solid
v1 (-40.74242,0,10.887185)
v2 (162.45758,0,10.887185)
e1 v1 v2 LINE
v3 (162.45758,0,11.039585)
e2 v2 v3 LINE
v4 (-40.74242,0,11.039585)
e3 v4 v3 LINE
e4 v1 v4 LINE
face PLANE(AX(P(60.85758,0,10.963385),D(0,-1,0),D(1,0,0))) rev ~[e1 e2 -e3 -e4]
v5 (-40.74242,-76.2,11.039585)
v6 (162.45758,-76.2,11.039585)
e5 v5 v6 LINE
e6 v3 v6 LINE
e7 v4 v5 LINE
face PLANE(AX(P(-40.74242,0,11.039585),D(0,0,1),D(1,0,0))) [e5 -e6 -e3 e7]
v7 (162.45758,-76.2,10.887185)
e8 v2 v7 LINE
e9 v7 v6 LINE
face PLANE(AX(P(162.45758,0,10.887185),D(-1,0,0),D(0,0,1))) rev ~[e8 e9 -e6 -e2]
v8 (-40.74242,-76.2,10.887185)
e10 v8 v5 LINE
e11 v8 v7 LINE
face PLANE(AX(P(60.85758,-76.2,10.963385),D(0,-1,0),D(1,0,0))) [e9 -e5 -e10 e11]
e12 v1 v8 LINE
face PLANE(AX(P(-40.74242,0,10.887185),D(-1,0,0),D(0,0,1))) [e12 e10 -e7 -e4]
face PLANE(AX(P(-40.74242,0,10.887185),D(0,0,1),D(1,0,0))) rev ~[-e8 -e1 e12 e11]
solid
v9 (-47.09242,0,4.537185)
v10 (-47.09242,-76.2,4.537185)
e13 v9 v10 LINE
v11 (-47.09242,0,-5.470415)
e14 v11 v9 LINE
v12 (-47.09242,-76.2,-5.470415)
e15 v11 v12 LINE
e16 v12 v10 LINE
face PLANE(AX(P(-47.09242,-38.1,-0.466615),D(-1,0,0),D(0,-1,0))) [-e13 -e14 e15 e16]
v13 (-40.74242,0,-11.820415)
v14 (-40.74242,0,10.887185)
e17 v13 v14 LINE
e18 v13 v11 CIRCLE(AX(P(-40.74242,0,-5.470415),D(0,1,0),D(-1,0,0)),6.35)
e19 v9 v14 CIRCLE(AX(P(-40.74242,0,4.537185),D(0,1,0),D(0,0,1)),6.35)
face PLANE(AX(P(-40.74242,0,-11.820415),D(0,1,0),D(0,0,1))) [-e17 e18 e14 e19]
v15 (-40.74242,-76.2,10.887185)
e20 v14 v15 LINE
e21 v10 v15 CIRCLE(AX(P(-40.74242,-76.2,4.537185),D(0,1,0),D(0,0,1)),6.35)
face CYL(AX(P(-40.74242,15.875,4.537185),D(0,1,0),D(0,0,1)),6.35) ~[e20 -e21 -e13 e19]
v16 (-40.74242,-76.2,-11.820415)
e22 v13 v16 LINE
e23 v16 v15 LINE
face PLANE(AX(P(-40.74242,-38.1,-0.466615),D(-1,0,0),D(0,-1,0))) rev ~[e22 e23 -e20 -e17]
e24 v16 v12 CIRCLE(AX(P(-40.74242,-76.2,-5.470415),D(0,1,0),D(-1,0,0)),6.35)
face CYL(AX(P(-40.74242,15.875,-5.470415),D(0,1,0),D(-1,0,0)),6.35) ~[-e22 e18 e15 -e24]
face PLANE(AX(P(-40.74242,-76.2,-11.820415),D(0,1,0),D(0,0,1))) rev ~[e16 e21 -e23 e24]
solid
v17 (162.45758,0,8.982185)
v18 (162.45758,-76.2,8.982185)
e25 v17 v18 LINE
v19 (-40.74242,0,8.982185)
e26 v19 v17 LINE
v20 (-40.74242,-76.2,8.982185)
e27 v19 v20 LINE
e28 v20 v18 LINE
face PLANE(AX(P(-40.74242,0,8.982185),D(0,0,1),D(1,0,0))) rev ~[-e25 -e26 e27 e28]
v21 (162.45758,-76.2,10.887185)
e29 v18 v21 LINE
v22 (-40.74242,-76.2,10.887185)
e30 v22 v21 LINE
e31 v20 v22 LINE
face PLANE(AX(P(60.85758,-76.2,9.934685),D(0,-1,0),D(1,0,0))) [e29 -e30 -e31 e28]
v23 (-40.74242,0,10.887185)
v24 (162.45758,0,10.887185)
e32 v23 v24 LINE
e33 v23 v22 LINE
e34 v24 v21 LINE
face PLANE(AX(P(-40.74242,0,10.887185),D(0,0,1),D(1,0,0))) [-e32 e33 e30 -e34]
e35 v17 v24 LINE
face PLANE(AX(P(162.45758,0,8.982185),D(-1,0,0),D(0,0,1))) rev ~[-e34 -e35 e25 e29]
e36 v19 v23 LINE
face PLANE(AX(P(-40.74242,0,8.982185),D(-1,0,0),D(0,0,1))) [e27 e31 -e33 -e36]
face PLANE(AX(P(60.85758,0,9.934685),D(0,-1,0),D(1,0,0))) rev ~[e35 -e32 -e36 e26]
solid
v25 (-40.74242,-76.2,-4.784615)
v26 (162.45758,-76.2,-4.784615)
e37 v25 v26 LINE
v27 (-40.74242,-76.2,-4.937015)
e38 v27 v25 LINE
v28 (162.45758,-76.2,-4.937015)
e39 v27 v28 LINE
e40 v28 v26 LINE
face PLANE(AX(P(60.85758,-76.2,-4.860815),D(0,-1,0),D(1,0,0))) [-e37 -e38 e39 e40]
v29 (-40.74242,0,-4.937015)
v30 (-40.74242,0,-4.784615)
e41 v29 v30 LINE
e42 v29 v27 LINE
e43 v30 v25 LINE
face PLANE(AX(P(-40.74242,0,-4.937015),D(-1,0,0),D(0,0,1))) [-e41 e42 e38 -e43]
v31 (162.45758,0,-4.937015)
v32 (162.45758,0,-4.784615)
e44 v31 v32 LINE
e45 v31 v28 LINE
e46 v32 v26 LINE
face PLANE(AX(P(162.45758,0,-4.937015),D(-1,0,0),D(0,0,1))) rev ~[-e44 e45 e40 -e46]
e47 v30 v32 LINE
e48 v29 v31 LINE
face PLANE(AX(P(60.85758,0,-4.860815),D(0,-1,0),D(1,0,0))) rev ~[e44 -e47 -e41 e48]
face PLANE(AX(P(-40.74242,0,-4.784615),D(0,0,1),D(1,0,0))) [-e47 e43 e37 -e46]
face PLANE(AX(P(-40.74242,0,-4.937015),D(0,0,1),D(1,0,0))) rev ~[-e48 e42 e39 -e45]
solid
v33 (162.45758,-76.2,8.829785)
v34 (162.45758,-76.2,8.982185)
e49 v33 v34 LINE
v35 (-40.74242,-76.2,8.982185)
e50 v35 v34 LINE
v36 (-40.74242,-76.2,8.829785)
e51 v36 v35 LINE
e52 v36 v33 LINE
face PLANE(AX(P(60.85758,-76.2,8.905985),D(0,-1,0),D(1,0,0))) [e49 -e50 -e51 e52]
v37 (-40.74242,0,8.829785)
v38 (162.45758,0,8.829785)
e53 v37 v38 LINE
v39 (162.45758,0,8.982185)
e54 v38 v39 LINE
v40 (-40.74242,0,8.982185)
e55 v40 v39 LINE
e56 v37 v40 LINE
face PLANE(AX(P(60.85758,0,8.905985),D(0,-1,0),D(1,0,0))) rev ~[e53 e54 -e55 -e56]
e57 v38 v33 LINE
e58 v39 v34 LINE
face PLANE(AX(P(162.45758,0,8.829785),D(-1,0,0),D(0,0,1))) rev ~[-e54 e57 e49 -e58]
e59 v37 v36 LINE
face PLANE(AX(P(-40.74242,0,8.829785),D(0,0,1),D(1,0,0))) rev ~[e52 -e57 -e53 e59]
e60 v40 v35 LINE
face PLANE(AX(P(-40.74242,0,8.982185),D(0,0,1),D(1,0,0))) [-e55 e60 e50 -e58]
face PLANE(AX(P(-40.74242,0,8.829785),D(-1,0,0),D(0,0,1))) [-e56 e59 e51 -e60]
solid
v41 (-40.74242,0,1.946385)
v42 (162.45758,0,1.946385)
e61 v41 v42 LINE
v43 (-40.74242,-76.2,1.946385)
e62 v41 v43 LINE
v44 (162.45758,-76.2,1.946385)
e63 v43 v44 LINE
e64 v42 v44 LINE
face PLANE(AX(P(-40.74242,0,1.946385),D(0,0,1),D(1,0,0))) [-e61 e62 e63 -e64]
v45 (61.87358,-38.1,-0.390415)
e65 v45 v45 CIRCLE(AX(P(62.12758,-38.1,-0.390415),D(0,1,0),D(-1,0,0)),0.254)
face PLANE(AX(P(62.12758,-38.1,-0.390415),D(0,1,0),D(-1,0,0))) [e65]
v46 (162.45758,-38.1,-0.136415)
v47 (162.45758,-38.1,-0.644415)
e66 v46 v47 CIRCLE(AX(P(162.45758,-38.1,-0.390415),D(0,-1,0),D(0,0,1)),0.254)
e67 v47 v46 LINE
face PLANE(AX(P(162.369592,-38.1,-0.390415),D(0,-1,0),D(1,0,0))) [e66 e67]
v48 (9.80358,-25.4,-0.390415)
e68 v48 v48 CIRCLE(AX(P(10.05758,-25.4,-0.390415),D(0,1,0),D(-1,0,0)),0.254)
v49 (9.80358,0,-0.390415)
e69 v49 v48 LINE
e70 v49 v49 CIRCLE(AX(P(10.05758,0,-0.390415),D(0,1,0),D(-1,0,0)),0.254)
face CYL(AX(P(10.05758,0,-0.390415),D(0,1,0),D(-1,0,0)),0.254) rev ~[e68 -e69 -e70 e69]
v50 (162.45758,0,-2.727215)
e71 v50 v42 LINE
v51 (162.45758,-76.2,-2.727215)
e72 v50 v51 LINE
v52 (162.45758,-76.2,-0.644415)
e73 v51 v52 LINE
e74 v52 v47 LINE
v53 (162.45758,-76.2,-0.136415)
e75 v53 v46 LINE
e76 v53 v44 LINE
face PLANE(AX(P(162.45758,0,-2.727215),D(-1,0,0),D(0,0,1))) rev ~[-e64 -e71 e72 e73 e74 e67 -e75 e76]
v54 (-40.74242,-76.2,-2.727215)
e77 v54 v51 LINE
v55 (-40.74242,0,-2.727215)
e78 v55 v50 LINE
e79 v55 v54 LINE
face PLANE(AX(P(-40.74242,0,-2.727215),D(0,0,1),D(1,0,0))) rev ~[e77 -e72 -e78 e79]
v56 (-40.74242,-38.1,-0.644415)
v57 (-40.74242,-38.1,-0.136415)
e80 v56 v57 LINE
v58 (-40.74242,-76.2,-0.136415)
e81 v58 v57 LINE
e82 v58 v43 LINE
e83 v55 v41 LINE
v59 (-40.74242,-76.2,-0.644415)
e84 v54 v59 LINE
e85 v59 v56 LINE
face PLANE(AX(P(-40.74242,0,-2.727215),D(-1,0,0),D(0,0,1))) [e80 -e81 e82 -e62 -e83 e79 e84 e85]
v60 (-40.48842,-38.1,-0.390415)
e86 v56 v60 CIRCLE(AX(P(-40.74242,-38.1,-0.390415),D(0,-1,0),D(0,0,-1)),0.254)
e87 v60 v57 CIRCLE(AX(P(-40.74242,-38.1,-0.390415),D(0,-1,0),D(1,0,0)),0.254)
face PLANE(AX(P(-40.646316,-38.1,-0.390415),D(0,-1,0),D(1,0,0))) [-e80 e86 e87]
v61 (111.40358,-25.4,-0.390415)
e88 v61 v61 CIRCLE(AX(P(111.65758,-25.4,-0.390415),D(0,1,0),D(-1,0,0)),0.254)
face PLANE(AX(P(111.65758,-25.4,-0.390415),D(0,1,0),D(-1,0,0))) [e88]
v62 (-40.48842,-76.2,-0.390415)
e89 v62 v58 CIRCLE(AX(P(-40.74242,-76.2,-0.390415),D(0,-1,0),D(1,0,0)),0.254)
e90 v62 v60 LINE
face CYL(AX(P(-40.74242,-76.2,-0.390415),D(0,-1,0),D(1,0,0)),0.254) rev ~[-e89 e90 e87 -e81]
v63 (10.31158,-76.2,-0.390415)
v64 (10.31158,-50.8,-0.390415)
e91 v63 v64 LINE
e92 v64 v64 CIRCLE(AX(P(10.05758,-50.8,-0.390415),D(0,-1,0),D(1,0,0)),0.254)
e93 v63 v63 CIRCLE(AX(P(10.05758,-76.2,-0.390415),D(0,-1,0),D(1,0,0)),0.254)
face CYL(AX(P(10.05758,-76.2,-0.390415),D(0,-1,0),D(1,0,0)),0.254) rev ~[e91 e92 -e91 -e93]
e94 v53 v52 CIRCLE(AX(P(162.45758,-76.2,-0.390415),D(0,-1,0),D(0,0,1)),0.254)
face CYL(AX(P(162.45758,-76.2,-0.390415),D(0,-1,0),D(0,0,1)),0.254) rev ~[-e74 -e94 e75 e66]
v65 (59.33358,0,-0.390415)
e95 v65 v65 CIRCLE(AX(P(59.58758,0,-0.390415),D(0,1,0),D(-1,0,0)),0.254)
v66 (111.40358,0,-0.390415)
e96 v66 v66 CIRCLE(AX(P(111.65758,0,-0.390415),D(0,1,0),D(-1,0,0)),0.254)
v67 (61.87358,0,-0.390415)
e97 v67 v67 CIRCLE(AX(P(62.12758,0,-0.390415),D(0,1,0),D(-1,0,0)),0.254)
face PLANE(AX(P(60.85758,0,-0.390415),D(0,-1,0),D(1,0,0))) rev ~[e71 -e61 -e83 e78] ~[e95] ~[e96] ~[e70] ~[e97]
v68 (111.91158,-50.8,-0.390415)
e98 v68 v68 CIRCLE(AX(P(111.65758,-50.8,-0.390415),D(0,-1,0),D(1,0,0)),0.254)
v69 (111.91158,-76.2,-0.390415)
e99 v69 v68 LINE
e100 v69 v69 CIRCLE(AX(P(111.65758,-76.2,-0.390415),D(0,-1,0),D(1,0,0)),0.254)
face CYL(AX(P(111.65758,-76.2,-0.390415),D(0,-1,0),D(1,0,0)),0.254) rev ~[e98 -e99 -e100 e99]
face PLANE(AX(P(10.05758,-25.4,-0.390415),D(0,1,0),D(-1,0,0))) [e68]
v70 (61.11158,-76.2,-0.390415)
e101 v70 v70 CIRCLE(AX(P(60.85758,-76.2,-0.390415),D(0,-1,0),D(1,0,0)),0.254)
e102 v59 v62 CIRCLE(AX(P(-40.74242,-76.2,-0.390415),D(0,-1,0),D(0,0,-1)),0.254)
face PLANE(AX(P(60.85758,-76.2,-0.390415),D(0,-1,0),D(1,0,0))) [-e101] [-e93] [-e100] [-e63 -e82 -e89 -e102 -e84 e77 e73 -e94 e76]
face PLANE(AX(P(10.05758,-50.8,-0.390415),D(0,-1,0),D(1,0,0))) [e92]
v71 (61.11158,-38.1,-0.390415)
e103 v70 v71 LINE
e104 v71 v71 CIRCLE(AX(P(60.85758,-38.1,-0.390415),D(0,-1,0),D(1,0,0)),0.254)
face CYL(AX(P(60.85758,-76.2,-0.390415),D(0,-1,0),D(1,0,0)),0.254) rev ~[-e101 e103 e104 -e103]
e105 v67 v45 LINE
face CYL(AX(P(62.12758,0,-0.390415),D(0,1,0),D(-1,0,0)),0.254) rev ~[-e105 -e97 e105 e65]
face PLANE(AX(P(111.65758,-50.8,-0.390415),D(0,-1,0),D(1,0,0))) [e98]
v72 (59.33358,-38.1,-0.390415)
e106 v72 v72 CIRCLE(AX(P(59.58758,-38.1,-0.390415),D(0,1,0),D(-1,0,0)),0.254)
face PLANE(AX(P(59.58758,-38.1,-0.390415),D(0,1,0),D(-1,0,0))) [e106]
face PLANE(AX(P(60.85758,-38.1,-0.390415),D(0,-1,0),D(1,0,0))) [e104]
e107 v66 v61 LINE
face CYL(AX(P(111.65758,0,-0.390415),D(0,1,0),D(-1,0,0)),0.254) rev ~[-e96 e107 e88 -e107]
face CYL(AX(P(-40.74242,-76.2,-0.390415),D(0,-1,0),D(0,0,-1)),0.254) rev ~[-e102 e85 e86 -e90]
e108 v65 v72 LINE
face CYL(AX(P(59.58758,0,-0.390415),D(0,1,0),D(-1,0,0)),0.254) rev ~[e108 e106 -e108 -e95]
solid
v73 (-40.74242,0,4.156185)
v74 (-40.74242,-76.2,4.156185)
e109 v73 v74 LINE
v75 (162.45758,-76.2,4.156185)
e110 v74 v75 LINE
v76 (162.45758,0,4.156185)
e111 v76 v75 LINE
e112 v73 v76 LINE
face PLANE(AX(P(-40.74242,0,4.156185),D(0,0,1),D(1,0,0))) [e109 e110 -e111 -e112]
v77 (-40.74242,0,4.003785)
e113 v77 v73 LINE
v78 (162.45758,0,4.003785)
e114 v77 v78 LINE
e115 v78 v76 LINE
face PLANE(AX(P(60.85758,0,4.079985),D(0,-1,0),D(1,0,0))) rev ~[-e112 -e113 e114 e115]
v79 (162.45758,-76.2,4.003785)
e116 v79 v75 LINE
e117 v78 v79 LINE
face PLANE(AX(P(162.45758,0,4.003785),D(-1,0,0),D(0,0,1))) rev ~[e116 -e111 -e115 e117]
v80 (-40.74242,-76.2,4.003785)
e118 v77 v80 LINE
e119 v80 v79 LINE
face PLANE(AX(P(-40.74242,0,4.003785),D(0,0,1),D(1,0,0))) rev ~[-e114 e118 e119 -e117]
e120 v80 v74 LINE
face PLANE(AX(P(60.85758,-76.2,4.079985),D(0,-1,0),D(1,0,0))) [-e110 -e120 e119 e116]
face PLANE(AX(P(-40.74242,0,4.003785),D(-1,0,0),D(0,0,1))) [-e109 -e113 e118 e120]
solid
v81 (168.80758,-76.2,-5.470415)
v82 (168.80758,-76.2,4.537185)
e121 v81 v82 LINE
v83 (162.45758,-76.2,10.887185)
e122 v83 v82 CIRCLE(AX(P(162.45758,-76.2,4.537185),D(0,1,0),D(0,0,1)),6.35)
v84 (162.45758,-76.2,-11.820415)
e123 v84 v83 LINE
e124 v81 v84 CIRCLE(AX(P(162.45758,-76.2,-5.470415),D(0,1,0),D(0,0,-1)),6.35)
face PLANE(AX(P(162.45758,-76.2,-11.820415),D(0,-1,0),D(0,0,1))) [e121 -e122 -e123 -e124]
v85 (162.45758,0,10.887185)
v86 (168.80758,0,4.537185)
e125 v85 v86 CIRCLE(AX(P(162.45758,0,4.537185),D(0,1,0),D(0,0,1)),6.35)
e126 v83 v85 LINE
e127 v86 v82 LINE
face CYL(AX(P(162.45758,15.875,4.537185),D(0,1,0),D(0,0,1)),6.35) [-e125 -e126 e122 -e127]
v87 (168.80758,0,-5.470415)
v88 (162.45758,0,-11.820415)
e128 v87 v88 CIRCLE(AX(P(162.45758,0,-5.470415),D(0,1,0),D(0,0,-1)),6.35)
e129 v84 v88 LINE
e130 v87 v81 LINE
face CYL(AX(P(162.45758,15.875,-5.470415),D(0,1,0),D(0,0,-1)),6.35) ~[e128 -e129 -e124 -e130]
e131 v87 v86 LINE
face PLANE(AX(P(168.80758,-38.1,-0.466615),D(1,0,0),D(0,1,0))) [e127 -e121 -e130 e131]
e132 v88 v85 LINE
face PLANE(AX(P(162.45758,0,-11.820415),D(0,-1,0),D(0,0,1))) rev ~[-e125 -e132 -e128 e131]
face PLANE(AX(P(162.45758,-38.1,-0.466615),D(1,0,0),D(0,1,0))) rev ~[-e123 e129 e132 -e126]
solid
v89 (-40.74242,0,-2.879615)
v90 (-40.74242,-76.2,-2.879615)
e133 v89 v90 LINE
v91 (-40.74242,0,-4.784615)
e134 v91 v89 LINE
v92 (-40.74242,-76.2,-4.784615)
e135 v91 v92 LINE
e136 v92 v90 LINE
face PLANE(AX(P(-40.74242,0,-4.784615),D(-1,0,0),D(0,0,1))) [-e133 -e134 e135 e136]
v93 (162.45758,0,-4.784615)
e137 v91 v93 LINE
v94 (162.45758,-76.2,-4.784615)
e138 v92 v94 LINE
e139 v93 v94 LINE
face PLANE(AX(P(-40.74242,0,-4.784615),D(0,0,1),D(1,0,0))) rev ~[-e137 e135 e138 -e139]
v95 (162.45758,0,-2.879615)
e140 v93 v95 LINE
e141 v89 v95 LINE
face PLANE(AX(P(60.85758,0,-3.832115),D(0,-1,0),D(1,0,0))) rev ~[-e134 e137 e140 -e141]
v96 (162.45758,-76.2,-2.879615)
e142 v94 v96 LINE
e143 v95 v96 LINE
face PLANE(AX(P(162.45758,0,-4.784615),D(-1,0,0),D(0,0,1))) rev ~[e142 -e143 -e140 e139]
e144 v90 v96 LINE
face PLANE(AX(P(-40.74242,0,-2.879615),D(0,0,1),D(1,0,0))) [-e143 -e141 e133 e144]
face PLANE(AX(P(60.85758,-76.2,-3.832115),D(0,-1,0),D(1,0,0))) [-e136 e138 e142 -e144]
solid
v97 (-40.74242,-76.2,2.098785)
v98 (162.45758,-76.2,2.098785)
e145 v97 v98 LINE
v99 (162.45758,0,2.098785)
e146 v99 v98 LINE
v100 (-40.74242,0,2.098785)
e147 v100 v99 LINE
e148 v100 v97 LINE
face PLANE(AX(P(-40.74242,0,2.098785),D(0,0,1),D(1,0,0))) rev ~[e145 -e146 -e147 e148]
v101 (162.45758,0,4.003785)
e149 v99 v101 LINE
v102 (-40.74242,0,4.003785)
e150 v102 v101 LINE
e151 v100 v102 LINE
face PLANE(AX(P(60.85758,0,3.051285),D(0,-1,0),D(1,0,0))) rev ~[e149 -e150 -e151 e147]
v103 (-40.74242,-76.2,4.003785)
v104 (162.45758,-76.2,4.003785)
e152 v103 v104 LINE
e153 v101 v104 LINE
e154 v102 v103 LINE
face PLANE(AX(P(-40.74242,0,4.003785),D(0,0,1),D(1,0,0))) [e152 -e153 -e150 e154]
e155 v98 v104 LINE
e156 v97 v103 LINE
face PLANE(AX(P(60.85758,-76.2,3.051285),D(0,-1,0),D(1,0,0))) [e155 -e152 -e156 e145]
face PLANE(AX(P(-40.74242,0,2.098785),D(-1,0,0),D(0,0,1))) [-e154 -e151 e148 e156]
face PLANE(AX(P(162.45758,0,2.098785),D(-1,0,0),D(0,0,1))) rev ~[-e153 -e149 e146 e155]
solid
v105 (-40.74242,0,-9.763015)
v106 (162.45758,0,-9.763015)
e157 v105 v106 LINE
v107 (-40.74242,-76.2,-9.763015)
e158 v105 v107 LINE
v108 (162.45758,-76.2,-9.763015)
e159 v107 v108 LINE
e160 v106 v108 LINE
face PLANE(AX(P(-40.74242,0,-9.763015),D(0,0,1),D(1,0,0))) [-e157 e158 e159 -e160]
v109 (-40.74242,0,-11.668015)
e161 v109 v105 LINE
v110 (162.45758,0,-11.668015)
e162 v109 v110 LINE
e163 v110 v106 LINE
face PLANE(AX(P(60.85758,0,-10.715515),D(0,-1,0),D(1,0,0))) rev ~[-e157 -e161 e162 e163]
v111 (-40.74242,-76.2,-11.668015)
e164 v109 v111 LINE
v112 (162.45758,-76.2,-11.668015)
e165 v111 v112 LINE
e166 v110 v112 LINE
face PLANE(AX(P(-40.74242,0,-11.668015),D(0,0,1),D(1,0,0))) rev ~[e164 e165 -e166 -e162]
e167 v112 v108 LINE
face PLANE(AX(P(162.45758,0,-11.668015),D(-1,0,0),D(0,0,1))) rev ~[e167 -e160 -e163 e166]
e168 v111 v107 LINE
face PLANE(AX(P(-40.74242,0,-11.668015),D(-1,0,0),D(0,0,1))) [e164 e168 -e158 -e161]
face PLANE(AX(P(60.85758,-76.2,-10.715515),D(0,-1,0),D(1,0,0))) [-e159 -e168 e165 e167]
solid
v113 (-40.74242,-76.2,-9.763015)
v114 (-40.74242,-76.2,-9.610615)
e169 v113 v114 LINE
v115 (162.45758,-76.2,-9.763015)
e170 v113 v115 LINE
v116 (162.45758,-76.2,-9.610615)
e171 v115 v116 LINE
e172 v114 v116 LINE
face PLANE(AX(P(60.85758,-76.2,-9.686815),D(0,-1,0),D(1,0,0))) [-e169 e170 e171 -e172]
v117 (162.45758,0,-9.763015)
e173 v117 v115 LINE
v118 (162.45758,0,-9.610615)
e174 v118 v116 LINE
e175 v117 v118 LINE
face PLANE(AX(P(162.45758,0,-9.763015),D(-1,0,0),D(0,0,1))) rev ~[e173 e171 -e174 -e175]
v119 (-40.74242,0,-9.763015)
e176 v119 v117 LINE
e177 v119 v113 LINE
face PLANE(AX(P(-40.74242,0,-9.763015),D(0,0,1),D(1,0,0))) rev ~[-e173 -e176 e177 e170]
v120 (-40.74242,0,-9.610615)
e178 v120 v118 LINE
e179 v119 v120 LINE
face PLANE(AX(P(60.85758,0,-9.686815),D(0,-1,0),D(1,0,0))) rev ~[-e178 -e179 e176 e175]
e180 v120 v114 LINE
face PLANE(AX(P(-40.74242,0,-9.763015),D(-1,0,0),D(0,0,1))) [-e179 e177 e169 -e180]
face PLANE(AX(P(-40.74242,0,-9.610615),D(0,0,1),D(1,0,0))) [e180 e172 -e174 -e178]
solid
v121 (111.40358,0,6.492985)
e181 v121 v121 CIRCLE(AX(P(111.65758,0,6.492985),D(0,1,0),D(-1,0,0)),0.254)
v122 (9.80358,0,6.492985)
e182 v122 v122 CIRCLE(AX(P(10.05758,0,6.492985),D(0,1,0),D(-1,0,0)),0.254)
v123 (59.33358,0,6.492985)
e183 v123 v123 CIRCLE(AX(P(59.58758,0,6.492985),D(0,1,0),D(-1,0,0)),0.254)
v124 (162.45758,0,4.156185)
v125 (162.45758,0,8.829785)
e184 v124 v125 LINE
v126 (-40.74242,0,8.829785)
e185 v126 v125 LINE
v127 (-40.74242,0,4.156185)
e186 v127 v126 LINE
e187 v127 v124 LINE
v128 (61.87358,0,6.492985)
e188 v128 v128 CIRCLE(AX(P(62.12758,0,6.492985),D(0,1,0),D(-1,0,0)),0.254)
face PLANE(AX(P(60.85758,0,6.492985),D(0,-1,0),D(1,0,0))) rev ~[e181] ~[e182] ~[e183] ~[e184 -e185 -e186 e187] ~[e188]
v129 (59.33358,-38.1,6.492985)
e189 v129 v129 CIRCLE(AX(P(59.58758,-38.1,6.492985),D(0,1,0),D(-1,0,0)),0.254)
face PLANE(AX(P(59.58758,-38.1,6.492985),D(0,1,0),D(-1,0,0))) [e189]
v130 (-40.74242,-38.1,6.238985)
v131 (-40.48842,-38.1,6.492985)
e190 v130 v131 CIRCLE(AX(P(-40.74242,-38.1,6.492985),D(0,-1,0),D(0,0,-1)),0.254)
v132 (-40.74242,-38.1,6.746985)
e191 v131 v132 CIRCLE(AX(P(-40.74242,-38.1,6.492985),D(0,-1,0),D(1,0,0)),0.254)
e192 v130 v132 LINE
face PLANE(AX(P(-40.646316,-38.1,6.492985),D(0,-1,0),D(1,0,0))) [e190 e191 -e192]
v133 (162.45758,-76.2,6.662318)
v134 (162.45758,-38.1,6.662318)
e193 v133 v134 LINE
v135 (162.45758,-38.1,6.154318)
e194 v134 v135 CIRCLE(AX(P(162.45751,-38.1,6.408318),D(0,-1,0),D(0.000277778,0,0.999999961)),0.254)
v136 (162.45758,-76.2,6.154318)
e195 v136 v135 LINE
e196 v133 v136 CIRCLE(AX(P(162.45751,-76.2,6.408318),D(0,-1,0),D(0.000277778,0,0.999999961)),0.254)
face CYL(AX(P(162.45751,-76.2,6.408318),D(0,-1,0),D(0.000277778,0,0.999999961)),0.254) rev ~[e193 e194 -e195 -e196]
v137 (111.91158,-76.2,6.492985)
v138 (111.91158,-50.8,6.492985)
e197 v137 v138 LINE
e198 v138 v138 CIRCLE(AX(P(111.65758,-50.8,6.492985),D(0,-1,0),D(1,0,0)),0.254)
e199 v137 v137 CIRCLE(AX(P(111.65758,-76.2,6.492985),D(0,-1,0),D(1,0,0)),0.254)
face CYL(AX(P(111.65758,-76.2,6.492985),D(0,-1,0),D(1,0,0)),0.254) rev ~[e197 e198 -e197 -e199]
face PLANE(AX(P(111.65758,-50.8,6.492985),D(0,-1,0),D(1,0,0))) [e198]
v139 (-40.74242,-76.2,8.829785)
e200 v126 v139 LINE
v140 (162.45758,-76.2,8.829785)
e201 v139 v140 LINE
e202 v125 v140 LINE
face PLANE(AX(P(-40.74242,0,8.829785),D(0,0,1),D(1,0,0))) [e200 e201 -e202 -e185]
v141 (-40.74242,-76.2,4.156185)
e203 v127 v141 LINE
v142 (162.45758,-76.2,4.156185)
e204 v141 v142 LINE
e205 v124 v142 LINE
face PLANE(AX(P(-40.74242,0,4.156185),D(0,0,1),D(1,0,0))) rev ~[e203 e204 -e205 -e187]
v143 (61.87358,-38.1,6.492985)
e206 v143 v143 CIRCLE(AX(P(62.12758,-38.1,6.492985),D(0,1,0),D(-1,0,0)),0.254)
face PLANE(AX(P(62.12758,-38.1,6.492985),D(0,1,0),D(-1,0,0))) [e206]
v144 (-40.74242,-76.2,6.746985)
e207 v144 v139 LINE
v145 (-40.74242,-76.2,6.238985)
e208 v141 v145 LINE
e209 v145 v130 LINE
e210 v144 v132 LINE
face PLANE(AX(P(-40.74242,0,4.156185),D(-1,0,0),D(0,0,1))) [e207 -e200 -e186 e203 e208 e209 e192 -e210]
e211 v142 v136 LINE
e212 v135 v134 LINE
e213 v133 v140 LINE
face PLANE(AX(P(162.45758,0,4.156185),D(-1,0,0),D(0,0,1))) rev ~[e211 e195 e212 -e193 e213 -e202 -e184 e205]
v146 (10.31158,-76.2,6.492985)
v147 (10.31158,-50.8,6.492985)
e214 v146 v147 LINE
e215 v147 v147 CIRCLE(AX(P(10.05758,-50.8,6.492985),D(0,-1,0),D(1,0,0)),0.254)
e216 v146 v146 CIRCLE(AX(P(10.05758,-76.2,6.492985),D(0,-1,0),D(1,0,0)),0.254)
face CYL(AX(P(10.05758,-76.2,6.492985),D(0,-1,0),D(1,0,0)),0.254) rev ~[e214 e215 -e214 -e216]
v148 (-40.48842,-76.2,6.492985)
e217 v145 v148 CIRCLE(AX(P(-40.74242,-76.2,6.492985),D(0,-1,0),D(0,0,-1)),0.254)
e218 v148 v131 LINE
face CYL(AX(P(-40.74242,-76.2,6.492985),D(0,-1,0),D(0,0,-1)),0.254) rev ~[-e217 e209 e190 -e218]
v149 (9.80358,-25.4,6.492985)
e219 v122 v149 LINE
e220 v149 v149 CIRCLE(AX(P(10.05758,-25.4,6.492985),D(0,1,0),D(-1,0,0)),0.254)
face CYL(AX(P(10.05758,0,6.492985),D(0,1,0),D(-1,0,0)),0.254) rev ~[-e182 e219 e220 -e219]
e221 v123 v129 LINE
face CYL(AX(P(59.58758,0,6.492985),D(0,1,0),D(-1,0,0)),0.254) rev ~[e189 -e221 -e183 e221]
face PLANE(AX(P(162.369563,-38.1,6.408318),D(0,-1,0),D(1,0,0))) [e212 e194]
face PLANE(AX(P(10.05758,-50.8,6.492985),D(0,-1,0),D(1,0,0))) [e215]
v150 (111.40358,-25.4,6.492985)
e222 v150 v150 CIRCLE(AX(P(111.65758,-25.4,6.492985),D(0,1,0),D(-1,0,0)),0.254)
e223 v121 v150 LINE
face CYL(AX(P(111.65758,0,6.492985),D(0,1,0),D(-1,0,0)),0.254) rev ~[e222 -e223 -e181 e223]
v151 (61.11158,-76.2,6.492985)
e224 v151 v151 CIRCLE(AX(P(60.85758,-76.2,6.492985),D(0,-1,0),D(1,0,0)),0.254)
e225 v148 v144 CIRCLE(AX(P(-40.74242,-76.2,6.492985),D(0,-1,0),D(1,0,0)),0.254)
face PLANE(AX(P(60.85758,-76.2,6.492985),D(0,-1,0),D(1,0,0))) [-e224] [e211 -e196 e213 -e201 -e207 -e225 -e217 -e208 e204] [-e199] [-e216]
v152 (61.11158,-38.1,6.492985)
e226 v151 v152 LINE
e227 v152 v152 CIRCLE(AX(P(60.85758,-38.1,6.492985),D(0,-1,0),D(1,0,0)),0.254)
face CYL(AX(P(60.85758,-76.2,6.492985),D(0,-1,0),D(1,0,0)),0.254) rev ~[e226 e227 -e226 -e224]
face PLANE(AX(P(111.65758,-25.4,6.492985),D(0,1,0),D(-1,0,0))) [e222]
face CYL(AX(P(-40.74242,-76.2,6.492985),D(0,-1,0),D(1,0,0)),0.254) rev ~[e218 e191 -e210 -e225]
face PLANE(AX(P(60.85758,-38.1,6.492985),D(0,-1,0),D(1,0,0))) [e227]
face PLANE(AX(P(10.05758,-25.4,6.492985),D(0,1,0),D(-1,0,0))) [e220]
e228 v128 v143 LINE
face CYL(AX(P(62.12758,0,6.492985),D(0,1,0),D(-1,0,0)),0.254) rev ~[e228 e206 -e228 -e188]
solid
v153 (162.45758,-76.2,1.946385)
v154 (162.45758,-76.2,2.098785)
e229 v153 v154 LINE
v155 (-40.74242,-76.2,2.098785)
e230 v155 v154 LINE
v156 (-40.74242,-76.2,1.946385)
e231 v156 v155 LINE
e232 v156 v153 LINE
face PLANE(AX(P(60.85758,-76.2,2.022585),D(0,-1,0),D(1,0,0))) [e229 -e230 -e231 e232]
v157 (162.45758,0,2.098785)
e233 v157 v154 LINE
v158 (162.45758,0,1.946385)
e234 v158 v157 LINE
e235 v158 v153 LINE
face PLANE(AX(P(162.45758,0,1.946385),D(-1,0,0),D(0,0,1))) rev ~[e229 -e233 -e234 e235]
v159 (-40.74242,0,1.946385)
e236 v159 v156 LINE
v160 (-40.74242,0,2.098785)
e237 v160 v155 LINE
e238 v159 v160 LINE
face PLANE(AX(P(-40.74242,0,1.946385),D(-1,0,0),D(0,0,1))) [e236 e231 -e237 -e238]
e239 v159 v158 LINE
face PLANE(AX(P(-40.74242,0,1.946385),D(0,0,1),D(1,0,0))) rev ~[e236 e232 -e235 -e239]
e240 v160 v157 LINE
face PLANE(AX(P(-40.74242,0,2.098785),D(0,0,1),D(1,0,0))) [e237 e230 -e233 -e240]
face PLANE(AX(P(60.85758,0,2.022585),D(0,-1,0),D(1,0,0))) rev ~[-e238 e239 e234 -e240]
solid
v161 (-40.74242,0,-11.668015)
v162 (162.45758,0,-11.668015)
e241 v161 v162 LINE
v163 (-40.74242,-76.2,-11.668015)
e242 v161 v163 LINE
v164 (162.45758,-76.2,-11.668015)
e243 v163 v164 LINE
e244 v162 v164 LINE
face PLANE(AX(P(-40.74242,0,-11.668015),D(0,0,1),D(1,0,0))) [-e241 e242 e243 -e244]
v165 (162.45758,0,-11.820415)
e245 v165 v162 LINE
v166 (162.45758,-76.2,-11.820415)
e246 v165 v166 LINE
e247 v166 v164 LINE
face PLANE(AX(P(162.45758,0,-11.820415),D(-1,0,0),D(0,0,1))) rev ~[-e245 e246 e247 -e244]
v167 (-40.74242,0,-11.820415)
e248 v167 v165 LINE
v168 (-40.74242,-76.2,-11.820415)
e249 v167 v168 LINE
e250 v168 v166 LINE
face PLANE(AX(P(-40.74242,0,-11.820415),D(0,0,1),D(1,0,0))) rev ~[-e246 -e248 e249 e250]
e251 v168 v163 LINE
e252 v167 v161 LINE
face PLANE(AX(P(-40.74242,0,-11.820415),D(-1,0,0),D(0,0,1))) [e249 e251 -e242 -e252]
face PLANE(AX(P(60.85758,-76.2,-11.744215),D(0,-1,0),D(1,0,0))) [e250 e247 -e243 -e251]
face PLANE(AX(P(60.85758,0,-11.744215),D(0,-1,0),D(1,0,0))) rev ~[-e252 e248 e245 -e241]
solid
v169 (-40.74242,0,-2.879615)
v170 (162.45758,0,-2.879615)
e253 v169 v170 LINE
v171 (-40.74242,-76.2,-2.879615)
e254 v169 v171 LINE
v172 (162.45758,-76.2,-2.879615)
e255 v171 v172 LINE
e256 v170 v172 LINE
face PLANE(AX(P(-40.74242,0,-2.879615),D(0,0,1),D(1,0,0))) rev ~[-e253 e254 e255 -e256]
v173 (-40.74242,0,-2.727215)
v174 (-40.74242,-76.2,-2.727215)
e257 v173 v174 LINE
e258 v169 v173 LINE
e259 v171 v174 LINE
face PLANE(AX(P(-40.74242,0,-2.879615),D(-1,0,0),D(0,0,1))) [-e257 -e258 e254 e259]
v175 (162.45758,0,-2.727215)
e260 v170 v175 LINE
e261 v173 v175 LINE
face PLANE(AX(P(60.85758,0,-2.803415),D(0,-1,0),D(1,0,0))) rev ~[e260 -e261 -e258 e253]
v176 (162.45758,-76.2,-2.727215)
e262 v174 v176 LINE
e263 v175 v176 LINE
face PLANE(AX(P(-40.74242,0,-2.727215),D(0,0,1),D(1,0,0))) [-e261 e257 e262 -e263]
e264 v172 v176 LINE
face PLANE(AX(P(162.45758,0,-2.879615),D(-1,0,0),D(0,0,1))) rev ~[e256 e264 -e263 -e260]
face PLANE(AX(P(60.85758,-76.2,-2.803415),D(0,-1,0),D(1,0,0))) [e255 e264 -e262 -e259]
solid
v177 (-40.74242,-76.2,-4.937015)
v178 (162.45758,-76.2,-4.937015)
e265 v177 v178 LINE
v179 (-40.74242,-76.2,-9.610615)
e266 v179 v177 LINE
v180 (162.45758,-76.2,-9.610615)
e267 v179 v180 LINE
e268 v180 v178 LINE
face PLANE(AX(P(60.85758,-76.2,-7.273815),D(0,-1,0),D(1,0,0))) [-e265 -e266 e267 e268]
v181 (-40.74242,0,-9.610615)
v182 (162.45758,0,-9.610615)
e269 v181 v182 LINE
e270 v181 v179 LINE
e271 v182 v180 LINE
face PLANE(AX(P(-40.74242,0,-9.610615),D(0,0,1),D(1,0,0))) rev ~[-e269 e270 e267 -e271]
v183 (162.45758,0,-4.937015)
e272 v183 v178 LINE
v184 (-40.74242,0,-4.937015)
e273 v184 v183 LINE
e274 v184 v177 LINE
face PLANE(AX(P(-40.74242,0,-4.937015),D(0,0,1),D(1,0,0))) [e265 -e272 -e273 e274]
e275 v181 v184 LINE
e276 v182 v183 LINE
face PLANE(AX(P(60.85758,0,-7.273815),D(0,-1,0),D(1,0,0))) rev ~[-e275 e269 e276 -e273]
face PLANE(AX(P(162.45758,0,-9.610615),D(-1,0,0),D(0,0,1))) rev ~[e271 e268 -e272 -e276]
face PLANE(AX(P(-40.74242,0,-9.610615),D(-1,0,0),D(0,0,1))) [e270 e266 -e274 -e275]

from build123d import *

# Parameters (mm, degrees)
F0_W           = 203.2
F0_H           = 0.1524
F1_DEPTH       = 76.2
F0_H_2         = 1.905
F2_DEPTH       = 76.2
F0_H_3         = 4.6736
F3_DEPTH       = 76.2
F4_W           = 76.2
F4_H           = 22.7076
F5_DEPTH       = 6.35
F6_W           = 76.2
F6_H           = 22.7076
F7_DEPTH       = 6.35
F8_R           = 0.254
F9_DEPTH       = 38.1
F10_R          = 0.254
F11_DEPTH      = 38.1
F12_T1_DEPTH   = 107.95
F12_T3_DEPTH   = 107.95
F12_2_T1_DEPTH = 107.95
F12_2_T3_DEPTH = 107.95
F13_DEPTH      = 25.4
F14_DEPTH      = 25.4
F15_R          = 0.254
F16_R          = 0.254
F17_DEPTH      = 25.4
F18_DEPTH      = 38.1


# Not quite as in the source:
# - a fillet or chamfer that OpenCascade refuses, or shapes differently, is made with other operations: its cross-section is extruded or revolved along the edge and cut away or added


with BuildPart() as f1:
    # F0 (on Front) → F1 (new body)
    with BuildSketch(Plane.XZ):
        with Locations((60.8575803399, -11.7442150349)):
            Rectangle(F0_W, F0_H)
    extrude(amount=F1_DEPTH)


with BuildPart() as f1b:
    # F0 (on Front) → F1, piece 2 (new body)
    with BuildSketch(Plane.XZ):
        with Locations((60.8575803399, -9.6868150349)):
            Rectangle(F0_W, F0_H)
    extrude(amount=F1_DEPTH)


with BuildPart() as f1c:
    # F0 (on Front) → F1, piece 3 (new body)
    with BuildSketch(Plane.XZ):
        with Locations((60.8575803399, -4.8608150349)):
            Rectangle(F0_W, F0_H)
    extrude(amount=F1_DEPTH)


with BuildPart() as f1d:
    # F0 (on Front) → F1, piece 4 (new body)
    with BuildSketch(Plane.XZ):
        with Locations((60.8575803399, -2.8034150349)):
            Rectangle(F0_W, F0_H)
    extrude(amount=F1_DEPTH)


with BuildPart() as f1e:
    # F0 (on Front) → F1, piece 5 (new body)
    with BuildSketch(Plane.XZ):
        with Locations((60.8575803399, 2.0225849651)):
            Rectangle(F0_W, F0_H)
    extrude(amount=F1_DEPTH)


with BuildPart() as f1f:
    # F0 (on Front) → F1, piece 6 (new body)
    with BuildSketch(Plane.XZ):
        with Locations((60.8575803399, 4.0799849651)):
            Rectangle(F0_W, F0_H)
    extrude(amount=F1_DEPTH)


with BuildPart() as f1g:
    # F0 (on Front) → F1, piece 7 (new body)
    with BuildSketch(Plane.XZ):
        with Locations((60.8575803399, 8.9059849651)):
            Rectangle(F0_W, F0_H)
    extrude(amount=F1_DEPTH)


with BuildPart() as f1h:
    # F0 (on Front) → F1, piece 8 (new body)
    with BuildSketch(Plane.XZ):
        with Locations((60.8575803399, 10.9633849651)):
            Rectangle(F0_W, F0_H)
    extrude(amount=F1_DEPTH)


with BuildPart() as f2:
    # F0 (on Front) → F2 (new body)
    with BuildSketch(Plane.XZ):
        with Locations((60.8575803399, -10.7155150349)):
            Rectangle(F0_W, F0_H_2)
    extrude(amount=F2_DEPTH)


with BuildPart() as f2b:
    # F0 (on Front) → F2, piece 2 (new body)
    with BuildSketch(Plane.XZ):
        with Locations((60.8575803399, -3.8321150349)):
            Rectangle(F0_W, F0_H_2)
    extrude(amount=F2_DEPTH)


with BuildPart() as f2c:
    # F0 (on Front) → F2, piece 3 (new body)
    with BuildSketch(Plane.XZ):
        with Locations((60.8575803399, 3.0512849651)):
            Rectangle(F0_W, F0_H_2)
    extrude(amount=F2_DEPTH)


with BuildPart() as f2d:
    # F0 (on Front) → F2, piece 4 (new body)
    with BuildSketch(Plane.XZ):
        with Locations((60.8575803399, 9.9346849651)):
            Rectangle(F0_W, F0_H_2)
    extrude(amount=F2_DEPTH)


with BuildPart() as f3:
    # F0 (on Front) → F3 (new body)
    with BuildSketch(Plane.XZ):
        with Locations((60.8575803399, 6.4929849651)):
            Rectangle(F0_W, F0_H_3)
    extrude(amount=F3_DEPTH)

    # F10 (on face) → F11 (cut)
    with BuildSketch(Plane.XZ.offset(76.2)):
        with BuildLine():
            ThreePointArc((-40.7424196601, 6.2389849651), (-40.5628145377, 6.3133798427), (-40.4884196601, 6.4929849651))
            ThreePointArc((-40.4884196601, 6.4929849651), (-40.5628145377, 6.6725900875), (-40.7424196601, 6.7469849651))
            Line((-40.7424196601, 6.7469849651), (-40.7424196601, 6.2389849651))
        make_face()
        with BuildLine():
            Line((-40.7424196601, 6.2389849651), (-40.7424196601, 6.7469849651))
            ThreePointArc((-40.7424196601, 6.7469849651), (-40.9964196601, 6.4929849651), (-40.7424196601, 6.2389849651))
        make_face()
        with BuildLine():
            Line((162.4575803399, 6.1543183082), (162.4575803399, 6.6623182886))
            ThreePointArc((162.4575803399, 6.6623182886), (162.2035097843, 6.4083182984), (162.4575803399, 6.1543183082))
        make_face()
        with Locations((60.8575803399, 6.4929849651)):
            Circle(F10_R)
    extrude(amount=-F11_DEPTH, mode=Mode.SUBTRACT)

    # F10 (on face) → F14 (cut)
    with BuildSketch(Plane.XZ.offset(76.2)):
        with Locations((10.0575803399, 6.4929849651)):
            Circle(F10_R)
        with Locations((111.6575803399, 6.4929849651)):
            Circle(F10_R)
    extrude(amount=-F14_DEPTH, mode=Mode.SUBTRACT)


with BuildPart() as f3b:
    # F0 (on Front) → F3, piece 2 (new body)
    with BuildSketch(Plane.XZ):
        with Locations((60.8575803399, -0.3904150349)):
            Rectangle(F0_W, F0_H_3)
    extrude(amount=F3_DEPTH)

    # F8 (on face) → F9 (cut)
    with BuildSketch(Plane.XZ.offset(76.2)):
        with BuildLine():
            ThreePointArc((-40.7424196601, -0.6444150349), (-40.5628145377, -0.5700201573), (-40.4884196601, -0.3904150349))
            ThreePointArc((-40.4884196601, -0.3904150349), (-40.5628145377, -0.2108099125), (-40.7424196601, -0.1364150349))
            Line((-40.7424196601, -0.1364150349), (-40.7424196601, -0.6444150349))
        make_face()
        with BuildLine():
            Line((-40.7424196601, -0.6444150349), (-40.7424196601, -0.1364150349))
            ThreePointArc((-40.7424196601, -0.1364150349), (-40.9964196601, -0.3904150349), (-40.7424196601, -0.6444150349))
        make_face()
        with BuildLine():
            Line((162.4575803399, -0.6444150349), (162.4575803399, -0.1364150349))
            ThreePointArc((162.4575803399, -0.1364150349), (162.2035803399, -0.3904150349), (162.4575803399, -0.6444150349))
        make_face()
        with Locations((60.8575803399, -0.3904150349)):
            Circle(F8_R)
    extrude(amount=-F9_DEPTH, mode=Mode.SUBTRACT)

    # F8 (on face) → F13 (cut)
    with BuildSketch(Plane.XZ.offset(76.2)):
        with Locations((10.0575803399, -0.3904150349)):
            Circle(F8_R)
        with Locations((111.6575803399, -0.3904150349)):
            Circle(F8_R)
    extrude(amount=-F13_DEPTH, mode=Mode.SUBTRACT)


with BuildPart() as f3c:
    # F0 (on Front) → F3, piece 3 (new body)
    with BuildSketch(Plane.XZ):
        with Locations((60.8575803399, -7.2738150349)):
            Rectangle(F0_W, F0_H_3)
    extrude(amount=F3_DEPTH)


with BuildPart() as f5:
    # F4 (on face) → F5 (new body)
    with BuildSketch(Plane.YZ.offset(162.4575803399)):
        with Locations((-38.1, -0.4666150349)):
            Rectangle(F4_W, F4_H)
    extrude(amount=F5_DEPTH)

    # F12: fillet of radius 6.35 on 4 edges, made by hand

    # F12_s2 → F12_t1 (cut)
    with BuildSketch(Plane.XZ.offset(-15.875)):
        with BuildLine():
            ThreePointArc((162.4575803399, -11.8204150349), (166.9477084004, -9.9605430954), (168.8075803399, -5.4704150349))
            Line((168.8075803399, -5.4704150349), (168.8075803399, -11.8204150349))
            Line((168.8075803399, -11.8204150349), (162.4575803399, -11.8204150349))
        make_face()
    extrude(amount=F12_T1_DEPTH, mode=Mode.SUBTRACT)

    # F12_s4 → F12_t3 (cut)
    with BuildSketch(Plane.XZ.offset(-15.875)):
        with BuildLine():
            ThreePointArc((162.4575803399, 10.8871849651), (166.9477084004, 9.0273130256), (168.8075803399, 4.5371849651))
            Line((168.8075803399, 4.5371849651), (168.8075803399, 10.8871849651))
            Line((168.8075803399, 10.8871849651), (162.4575803399, 10.8871849651))
        make_face()
    extrude(amount=F12_T3_DEPTH, mode=Mode.SUBTRACT)


with BuildPart() as f7:
    # F6 (on face) → F7 (new body)
    with BuildSketch(Plane(origin=(-40.7424196601, 0, 0), x_dir=(0, -1, 0), z_dir=(-1, 0, 0))):
        with Locations((38.1, -0.4666150349)):
            Rectangle(F6_W, F6_H)
    extrude(amount=F7_DEPTH)

    # F12#2: fillet of radius 6.35 on 4 edges, made by hand

    # F12_2_s2 → F12_2_t1 (cut)
    with BuildSketch(Plane.XZ.offset(-15.875)):
        with BuildLine():
            ThreePointArc((-40.7424196601, 10.8871849651), (-45.2325477206, 9.0273130256), (-47.0924196601, 4.5371849651))
            Line((-47.0924196601, 4.5371849651), (-47.0924196601, 10.8871849651))
            Line((-47.0924196601, 10.8871849651), (-40.7424196601, 10.8871849651))
        make_face()
    extrude(amount=F12_2_T1_DEPTH, mode=Mode.SUBTRACT)

    # F12_2_s4 → F12_2_t3 (cut)
    with BuildSketch(Plane.XZ.offset(-15.875)):
        with BuildLine():
            ThreePointArc((-47.0924196601, -5.4704150349), (-45.2325477206, -9.9605430954), (-40.7424196601, -11.8204150349))
            Line((-40.7424196601, -11.8204150349), (-47.0924196601, -11.8204150349))
            Line((-47.0924196601, -11.8204150349), (-47.0924196601, -5.4704150349))
        make_face()
    extrude(amount=F12_2_T3_DEPTH, mode=Mode.SUBTRACT)


with BuildPart() as f17_tool:
    # F15 (on face) + F16 (on face) → F17 (new body)
    with BuildSketch(Plane(origin=(0, 0, 0), x_dir=(-1, 0, 0), z_dir=(0, 1, 0))):
        with Locations((-111.6575803399, 6.4929849651)):
            Circle(F15_R)
        with Locations((-10.0575803399, 6.4929849651)):
            Circle(F15_R)
    with BuildSketch(Plane(origin=(0, 0, 0), x_dir=(-1, 0, 0), z_dir=(0, 1, 0))):
        with Locations((-111.6575803399, -0.3904150349)):
            Circle(F16_R)
        with Locations((-10.0575803399, -0.3904150349)):
            Circle(F16_R)
    extrude(amount=-F17_DEPTH)


with BuildPart() as f3_1:
    add(f3.part)

    # F17: cut by f17_tool
    add(f17_tool.part, mode=Mode.SUBTRACT)


with BuildPart() as f3b_1:
    add(f3b.part)

    # F17: cut by f17_tool
    add(f17_tool.part, mode=Mode.SUBTRACT)


with BuildPart() as f18_tool:
    # F16 (on face) + F15 (on face) → F18 (new body)
    with BuildSketch(Plane(origin=(0, 0, 0), x_dir=(-1, 0, 0), z_dir=(0, 1, 0))):
        with Locations((-62.1275803399, -0.3904150349)):
            Circle(F16_R)
        with Locations((-59.5875803399, -0.3904150349)):
            Circle(F16_R)
    with BuildSketch(Plane(origin=(0, 0, 0), x_dir=(-1, 0, 0), z_dir=(0, 1, 0))):
        with Locations((-62.1275803399, 6.4929849651)):
            Circle(F15_R)
        with Locations((-59.5875803399, 6.4929849651)):
            Circle(F15_R)
    extrude(amount=-F18_DEPTH)


with BuildPart() as f3_2:
    add(f3_1.part)

    # F18: cut by f18_tool
    add(f18_tool.part, mode=Mode.SUBTRACT)


with BuildPart() as f3b_2:
    add(f3b_1.part)

    # F18: cut by f18_tool
    add(f18_tool.part, mode=Mode.SUBTRACT)


solid = Compound([f1.part, f1b.part, f1c.part, f1d.part, f1e.part, f1f.part, f1g.part, f1h.part, f2.part, f2b.part, f2c.part, f2d.part, f3c.part, f5.part, f7.part, f3_2.part, f3b_2.part])
